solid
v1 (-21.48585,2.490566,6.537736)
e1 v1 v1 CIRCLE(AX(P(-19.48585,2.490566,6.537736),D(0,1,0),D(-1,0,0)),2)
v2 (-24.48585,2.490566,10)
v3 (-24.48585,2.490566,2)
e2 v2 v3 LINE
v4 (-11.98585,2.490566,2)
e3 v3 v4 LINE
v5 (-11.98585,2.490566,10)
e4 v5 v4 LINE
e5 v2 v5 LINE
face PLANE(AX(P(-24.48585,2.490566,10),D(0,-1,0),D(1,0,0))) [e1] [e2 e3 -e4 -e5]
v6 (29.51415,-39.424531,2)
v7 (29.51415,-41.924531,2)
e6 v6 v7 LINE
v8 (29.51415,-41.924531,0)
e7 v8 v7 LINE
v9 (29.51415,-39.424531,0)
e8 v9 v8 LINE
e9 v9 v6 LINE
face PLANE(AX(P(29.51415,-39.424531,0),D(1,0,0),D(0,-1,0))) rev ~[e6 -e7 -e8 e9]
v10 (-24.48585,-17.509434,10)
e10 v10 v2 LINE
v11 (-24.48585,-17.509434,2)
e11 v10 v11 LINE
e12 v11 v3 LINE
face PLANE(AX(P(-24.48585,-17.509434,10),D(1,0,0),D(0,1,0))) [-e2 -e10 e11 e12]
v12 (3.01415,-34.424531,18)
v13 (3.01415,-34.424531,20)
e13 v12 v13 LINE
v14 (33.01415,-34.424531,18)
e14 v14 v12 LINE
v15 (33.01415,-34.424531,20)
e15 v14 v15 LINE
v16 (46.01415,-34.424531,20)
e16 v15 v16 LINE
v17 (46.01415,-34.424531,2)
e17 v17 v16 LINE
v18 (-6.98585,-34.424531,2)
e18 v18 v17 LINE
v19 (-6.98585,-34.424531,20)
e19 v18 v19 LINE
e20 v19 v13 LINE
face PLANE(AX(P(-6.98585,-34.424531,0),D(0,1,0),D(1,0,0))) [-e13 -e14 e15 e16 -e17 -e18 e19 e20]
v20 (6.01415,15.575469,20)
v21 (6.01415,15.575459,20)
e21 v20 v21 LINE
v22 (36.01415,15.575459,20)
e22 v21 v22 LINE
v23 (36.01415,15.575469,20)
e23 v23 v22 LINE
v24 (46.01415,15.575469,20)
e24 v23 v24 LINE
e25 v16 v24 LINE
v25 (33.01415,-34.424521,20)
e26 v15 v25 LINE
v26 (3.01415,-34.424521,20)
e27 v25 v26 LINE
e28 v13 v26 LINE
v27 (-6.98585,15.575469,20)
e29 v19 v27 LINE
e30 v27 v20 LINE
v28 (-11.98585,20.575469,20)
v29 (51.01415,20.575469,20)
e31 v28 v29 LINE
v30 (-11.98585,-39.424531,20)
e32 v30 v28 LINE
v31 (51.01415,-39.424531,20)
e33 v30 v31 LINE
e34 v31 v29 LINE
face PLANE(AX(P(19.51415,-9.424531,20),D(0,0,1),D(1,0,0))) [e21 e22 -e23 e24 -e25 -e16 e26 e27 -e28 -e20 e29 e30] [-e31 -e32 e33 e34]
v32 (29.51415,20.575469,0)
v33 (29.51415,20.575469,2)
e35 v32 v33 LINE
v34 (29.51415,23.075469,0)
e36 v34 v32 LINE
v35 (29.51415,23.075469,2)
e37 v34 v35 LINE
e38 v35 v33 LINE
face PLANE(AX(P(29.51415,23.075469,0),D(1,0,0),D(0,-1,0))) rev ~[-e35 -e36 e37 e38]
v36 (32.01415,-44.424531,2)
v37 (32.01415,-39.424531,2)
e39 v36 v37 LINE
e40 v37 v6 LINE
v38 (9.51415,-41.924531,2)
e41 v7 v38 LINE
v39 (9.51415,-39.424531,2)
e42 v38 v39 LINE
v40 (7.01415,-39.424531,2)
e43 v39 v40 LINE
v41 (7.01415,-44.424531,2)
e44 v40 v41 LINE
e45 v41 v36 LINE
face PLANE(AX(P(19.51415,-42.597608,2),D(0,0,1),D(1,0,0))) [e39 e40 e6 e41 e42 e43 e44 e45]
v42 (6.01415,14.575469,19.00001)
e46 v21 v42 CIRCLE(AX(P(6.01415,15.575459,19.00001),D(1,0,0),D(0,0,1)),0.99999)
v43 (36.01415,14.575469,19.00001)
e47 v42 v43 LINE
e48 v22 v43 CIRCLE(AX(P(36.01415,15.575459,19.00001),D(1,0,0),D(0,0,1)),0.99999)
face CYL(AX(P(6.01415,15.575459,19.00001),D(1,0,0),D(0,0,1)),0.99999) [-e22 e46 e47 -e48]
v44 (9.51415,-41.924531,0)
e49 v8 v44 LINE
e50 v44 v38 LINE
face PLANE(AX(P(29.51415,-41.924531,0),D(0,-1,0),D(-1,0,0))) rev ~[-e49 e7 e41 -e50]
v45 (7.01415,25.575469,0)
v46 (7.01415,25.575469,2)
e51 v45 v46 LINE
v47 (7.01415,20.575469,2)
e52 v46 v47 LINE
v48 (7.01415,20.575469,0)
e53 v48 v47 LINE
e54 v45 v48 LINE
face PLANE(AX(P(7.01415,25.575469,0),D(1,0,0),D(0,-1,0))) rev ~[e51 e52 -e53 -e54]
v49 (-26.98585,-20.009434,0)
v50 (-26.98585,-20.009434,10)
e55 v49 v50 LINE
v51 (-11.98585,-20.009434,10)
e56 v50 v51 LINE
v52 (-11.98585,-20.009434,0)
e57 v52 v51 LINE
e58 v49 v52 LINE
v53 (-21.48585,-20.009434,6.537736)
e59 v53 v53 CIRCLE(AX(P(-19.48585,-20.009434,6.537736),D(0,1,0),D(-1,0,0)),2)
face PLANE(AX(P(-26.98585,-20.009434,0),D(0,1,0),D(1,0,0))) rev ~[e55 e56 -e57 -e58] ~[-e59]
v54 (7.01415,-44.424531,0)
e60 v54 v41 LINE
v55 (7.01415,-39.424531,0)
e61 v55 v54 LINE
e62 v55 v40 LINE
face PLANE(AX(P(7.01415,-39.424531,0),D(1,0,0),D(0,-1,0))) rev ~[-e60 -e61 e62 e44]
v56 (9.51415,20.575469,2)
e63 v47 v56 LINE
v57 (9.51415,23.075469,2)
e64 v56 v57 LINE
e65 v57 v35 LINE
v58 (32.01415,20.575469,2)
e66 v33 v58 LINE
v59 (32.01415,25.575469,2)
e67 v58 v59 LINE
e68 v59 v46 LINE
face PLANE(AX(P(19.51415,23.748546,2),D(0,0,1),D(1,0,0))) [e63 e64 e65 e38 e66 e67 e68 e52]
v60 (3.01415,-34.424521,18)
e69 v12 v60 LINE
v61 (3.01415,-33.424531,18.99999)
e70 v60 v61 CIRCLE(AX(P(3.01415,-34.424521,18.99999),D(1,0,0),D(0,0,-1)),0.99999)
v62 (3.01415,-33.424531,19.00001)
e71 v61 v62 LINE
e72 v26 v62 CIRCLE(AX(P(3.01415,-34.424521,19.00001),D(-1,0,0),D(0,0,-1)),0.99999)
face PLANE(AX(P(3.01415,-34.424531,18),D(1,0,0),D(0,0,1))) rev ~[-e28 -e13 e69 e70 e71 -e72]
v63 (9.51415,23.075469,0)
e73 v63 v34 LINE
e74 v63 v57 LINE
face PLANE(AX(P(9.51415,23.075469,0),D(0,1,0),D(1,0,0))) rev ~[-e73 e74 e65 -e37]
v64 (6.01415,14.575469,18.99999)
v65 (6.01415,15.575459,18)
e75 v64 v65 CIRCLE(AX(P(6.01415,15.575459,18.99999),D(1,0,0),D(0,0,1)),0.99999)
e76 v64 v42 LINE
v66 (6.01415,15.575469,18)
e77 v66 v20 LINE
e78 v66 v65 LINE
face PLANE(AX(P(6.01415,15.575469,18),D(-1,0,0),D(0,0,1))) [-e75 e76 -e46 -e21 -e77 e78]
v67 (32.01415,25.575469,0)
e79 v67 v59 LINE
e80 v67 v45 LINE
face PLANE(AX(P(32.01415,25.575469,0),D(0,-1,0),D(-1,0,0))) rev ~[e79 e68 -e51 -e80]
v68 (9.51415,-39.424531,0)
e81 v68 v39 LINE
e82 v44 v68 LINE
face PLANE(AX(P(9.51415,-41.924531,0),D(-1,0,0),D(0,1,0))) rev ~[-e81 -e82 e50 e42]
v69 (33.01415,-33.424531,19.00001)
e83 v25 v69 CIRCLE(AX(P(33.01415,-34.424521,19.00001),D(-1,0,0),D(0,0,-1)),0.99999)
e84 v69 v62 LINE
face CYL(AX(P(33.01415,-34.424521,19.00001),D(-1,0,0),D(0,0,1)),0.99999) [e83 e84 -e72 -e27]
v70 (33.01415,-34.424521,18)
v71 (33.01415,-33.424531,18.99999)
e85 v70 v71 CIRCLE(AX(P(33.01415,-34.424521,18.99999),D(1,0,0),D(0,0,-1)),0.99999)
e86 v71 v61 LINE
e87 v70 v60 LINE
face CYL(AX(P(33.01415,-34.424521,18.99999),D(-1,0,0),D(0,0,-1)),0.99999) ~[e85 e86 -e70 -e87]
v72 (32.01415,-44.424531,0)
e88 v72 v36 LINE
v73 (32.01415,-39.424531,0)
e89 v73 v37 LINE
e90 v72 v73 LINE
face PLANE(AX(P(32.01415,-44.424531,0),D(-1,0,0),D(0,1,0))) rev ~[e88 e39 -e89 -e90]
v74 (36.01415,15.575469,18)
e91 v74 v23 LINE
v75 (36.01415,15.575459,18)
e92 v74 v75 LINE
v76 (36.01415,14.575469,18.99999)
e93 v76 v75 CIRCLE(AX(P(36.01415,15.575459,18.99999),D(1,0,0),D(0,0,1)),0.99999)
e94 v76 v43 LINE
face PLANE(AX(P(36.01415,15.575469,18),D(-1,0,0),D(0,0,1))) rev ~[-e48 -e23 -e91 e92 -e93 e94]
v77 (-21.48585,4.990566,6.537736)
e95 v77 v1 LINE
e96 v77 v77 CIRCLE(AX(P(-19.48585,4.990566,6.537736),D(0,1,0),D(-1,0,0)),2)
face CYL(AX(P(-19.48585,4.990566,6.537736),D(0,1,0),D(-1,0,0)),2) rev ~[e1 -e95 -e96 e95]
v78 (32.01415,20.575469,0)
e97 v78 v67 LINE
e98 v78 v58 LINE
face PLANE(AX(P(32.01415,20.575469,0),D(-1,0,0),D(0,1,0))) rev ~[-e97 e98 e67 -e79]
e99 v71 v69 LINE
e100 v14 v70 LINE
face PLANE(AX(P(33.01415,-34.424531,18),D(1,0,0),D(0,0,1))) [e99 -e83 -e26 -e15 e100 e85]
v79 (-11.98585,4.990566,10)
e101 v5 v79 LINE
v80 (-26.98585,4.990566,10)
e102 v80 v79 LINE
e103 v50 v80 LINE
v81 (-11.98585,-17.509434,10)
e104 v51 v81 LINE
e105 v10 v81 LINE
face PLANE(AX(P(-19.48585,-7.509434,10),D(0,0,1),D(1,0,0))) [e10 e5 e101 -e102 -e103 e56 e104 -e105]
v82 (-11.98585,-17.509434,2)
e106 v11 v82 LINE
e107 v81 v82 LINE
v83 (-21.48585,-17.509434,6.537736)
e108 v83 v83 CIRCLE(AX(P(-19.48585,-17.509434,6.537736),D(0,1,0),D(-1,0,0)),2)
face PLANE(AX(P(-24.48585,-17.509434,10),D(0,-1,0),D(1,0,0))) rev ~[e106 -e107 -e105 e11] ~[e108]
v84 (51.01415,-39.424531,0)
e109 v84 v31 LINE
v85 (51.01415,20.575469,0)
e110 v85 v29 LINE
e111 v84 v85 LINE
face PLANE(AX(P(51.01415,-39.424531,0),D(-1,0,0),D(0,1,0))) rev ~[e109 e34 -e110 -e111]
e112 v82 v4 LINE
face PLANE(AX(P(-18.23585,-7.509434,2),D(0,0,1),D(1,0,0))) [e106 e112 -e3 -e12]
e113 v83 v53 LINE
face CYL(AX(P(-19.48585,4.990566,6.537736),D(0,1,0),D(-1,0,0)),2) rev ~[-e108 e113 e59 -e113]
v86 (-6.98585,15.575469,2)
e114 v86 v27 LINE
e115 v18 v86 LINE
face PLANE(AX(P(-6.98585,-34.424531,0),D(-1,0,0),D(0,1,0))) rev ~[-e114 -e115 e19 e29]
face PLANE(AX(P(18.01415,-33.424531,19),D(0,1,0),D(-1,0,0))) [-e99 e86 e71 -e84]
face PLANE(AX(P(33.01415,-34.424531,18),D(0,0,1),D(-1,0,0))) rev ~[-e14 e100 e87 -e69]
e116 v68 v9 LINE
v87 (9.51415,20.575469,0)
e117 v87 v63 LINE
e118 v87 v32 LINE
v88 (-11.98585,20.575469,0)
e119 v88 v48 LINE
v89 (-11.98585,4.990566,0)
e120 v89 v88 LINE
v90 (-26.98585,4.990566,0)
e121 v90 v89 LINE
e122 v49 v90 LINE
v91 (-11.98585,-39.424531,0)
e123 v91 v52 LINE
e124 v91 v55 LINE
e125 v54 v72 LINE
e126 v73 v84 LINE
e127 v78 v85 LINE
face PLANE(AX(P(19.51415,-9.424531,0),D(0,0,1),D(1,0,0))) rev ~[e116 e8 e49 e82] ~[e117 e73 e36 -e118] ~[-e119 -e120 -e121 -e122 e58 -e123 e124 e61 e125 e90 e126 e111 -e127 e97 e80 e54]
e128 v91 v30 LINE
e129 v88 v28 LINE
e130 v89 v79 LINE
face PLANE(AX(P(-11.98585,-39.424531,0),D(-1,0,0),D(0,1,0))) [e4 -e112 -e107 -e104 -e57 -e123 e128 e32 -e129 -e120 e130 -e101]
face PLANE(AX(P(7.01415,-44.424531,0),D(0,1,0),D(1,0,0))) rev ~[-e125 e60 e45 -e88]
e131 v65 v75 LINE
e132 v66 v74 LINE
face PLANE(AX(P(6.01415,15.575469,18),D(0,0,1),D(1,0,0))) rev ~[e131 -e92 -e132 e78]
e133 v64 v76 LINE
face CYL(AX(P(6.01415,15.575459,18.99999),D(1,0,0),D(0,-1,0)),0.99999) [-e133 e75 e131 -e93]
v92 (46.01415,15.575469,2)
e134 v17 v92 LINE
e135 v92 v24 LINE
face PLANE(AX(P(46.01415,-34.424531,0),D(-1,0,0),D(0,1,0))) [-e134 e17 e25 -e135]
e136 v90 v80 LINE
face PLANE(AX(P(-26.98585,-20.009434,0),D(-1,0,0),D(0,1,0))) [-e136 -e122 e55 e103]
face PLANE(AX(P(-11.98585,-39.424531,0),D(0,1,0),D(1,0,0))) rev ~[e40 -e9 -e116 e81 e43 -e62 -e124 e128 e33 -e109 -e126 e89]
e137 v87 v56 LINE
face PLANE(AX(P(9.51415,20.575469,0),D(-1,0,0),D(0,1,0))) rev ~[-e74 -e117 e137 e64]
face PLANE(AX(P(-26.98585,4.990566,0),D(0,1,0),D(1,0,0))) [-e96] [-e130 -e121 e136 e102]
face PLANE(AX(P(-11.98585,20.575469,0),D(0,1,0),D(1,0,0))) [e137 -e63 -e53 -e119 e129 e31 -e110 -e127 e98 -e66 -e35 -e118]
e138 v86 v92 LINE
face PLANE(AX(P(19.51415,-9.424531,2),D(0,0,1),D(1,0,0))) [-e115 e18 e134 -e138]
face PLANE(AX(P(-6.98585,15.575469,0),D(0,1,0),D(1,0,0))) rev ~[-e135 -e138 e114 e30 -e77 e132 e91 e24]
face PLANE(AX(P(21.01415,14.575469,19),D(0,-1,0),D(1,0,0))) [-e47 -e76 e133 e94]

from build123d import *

# Parameters (mm, degrees)
F0_W      = 63
F0_H      = 60
F0_W_2    = 53
F0_H_2    = 50
F1_DEPTH  = 20
F3_DEPTH  = 2
F4_DEPTH  = 2
F5_W      = 30
F5_H      = 2
F6_DEPTH  = 1
F7_W      = 30
F7_H      = 2
F8_DEPTH  = 1
F9_R      = 0.99999
F10_W     = 15
F10_H     = 25
F11_DEPTH = 10
F12_W     = 12.5
F12_H     = 20
F13_DEPTH = 8
F14_R     = 2
F15_DEPTH = 25


# Not quite as in the source:
# - a fillet or chamfer is up to 0.001 mm smaller than in the source, because OpenCascade refuses the exact size


with BuildPart() as f1:
    # F0 (on Top) → F1 (new body)
    with BuildSketch(Plane.XY):
        with Locations((19.5141504109, -9.4245311618)):
            Rectangle(F0_W, F0_H)
        with Locations((19.5141504109, -9.4245311618)):
            Rectangle(F0_W_2, F0_H_2, mode=Mode.SUBTRACT)
    extrude(amount=F1_DEPTH)

    # F2 (on Top) → F3 (join)
    with BuildSketch(Plane.XY):
        Polygon((7.0141504109, 25.5754688382), (7.0141504109, 20.5754688382), (9.5141504109, 20.5754688382), (9.5141504109, 23.0754688382), (29.5141504109, 23.0754688382), (29.5141504109, 20.5754688382), (32.0141504109, 20.5754688382), (32.0141504109, 25.5754688382), align=None)
        Polygon((9.5141504109, -39.4245311618), (7.0141504109, -39.4245311618), (7.0141504109, -44.4245311618), (32.0141504109, -44.4245311618), (32.0141504109, -39.4245311618), (29.5141504109, -39.4245311618), (29.5141504109, -41.9245311618), (9.5141504109, -41.9245311618), align=None)
    extrude(amount=F3_DEPTH)

    # F0 (on Top) → F4 (join)
    with BuildSketch(Plane.XY):
        with Locations((19.5141504109, -9.4245311618)):
            Rectangle(F0_W_2, F0_H_2)
    extrude(amount=F4_DEPTH)

    # F5 (on face) → F6 (join)
    with BuildSketch(Plane.XZ.offset(-15.5754688382)):
        with Locations((21.0141504109, 19)):
            Rectangle(F5_W, F5_H)
    extrude(amount=F6_DEPTH)

    # F7 (on face) → F8 (join)
    with BuildSketch(Plane(origin=(0, -34.4245311618, 0), x_dir=(-1, 0, 0), z_dir=(0, 1, 0))):
        with Locations((-18.0141504109, 19)):
            Rectangle(F7_W, F7_H)
    extrude(amount=F8_DEPTH)

    # F9 (radius 1 in the source; OpenCascade refuses exactly that, so slightly less here)
    f9_edges = [f1.edges().sort_by_distance(p)[0] for p in [
        (21.01415, 14.575469, 20),
        (21.01415, 14.575469, 18),
        (18.01415, -33.424531, 20),
        (18.01415, -33.424531, 18),
    ]]
    fillet(f9_edges, radius=F9_R)

    # F10 (on Top) → F11 (join)
    with BuildSketch(Plane.XY):
        with Locations((-19.4858495891, -7.5094338506)):
            Rectangle(F10_W, F10_H)
    extrude(amount=F11_DEPTH)

    # F12 (on face) → F13 (cut)
    with BuildSketch(Plane.XY.offset(10)):
        with Locations((-18.2358495891, -7.5094338506)):
            Rectangle(F12_W, F12_H)
    extrude(amount=-F13_DEPTH, mode=Mode.SUBTRACT)

    # F14 (on face) → F15 (cut)
    with BuildSketch(Plane(origin=(0, 4.9905661494, 0), x_dir=(-1, 0, 0), z_dir=(0, 1, 0))):
        with Locations((19.4858495891, 6.5377363935)):
            Circle(F14_R)
    extrude(amount=-F15_DEPTH, mode=Mode.SUBTRACT)


solid = f1.part
